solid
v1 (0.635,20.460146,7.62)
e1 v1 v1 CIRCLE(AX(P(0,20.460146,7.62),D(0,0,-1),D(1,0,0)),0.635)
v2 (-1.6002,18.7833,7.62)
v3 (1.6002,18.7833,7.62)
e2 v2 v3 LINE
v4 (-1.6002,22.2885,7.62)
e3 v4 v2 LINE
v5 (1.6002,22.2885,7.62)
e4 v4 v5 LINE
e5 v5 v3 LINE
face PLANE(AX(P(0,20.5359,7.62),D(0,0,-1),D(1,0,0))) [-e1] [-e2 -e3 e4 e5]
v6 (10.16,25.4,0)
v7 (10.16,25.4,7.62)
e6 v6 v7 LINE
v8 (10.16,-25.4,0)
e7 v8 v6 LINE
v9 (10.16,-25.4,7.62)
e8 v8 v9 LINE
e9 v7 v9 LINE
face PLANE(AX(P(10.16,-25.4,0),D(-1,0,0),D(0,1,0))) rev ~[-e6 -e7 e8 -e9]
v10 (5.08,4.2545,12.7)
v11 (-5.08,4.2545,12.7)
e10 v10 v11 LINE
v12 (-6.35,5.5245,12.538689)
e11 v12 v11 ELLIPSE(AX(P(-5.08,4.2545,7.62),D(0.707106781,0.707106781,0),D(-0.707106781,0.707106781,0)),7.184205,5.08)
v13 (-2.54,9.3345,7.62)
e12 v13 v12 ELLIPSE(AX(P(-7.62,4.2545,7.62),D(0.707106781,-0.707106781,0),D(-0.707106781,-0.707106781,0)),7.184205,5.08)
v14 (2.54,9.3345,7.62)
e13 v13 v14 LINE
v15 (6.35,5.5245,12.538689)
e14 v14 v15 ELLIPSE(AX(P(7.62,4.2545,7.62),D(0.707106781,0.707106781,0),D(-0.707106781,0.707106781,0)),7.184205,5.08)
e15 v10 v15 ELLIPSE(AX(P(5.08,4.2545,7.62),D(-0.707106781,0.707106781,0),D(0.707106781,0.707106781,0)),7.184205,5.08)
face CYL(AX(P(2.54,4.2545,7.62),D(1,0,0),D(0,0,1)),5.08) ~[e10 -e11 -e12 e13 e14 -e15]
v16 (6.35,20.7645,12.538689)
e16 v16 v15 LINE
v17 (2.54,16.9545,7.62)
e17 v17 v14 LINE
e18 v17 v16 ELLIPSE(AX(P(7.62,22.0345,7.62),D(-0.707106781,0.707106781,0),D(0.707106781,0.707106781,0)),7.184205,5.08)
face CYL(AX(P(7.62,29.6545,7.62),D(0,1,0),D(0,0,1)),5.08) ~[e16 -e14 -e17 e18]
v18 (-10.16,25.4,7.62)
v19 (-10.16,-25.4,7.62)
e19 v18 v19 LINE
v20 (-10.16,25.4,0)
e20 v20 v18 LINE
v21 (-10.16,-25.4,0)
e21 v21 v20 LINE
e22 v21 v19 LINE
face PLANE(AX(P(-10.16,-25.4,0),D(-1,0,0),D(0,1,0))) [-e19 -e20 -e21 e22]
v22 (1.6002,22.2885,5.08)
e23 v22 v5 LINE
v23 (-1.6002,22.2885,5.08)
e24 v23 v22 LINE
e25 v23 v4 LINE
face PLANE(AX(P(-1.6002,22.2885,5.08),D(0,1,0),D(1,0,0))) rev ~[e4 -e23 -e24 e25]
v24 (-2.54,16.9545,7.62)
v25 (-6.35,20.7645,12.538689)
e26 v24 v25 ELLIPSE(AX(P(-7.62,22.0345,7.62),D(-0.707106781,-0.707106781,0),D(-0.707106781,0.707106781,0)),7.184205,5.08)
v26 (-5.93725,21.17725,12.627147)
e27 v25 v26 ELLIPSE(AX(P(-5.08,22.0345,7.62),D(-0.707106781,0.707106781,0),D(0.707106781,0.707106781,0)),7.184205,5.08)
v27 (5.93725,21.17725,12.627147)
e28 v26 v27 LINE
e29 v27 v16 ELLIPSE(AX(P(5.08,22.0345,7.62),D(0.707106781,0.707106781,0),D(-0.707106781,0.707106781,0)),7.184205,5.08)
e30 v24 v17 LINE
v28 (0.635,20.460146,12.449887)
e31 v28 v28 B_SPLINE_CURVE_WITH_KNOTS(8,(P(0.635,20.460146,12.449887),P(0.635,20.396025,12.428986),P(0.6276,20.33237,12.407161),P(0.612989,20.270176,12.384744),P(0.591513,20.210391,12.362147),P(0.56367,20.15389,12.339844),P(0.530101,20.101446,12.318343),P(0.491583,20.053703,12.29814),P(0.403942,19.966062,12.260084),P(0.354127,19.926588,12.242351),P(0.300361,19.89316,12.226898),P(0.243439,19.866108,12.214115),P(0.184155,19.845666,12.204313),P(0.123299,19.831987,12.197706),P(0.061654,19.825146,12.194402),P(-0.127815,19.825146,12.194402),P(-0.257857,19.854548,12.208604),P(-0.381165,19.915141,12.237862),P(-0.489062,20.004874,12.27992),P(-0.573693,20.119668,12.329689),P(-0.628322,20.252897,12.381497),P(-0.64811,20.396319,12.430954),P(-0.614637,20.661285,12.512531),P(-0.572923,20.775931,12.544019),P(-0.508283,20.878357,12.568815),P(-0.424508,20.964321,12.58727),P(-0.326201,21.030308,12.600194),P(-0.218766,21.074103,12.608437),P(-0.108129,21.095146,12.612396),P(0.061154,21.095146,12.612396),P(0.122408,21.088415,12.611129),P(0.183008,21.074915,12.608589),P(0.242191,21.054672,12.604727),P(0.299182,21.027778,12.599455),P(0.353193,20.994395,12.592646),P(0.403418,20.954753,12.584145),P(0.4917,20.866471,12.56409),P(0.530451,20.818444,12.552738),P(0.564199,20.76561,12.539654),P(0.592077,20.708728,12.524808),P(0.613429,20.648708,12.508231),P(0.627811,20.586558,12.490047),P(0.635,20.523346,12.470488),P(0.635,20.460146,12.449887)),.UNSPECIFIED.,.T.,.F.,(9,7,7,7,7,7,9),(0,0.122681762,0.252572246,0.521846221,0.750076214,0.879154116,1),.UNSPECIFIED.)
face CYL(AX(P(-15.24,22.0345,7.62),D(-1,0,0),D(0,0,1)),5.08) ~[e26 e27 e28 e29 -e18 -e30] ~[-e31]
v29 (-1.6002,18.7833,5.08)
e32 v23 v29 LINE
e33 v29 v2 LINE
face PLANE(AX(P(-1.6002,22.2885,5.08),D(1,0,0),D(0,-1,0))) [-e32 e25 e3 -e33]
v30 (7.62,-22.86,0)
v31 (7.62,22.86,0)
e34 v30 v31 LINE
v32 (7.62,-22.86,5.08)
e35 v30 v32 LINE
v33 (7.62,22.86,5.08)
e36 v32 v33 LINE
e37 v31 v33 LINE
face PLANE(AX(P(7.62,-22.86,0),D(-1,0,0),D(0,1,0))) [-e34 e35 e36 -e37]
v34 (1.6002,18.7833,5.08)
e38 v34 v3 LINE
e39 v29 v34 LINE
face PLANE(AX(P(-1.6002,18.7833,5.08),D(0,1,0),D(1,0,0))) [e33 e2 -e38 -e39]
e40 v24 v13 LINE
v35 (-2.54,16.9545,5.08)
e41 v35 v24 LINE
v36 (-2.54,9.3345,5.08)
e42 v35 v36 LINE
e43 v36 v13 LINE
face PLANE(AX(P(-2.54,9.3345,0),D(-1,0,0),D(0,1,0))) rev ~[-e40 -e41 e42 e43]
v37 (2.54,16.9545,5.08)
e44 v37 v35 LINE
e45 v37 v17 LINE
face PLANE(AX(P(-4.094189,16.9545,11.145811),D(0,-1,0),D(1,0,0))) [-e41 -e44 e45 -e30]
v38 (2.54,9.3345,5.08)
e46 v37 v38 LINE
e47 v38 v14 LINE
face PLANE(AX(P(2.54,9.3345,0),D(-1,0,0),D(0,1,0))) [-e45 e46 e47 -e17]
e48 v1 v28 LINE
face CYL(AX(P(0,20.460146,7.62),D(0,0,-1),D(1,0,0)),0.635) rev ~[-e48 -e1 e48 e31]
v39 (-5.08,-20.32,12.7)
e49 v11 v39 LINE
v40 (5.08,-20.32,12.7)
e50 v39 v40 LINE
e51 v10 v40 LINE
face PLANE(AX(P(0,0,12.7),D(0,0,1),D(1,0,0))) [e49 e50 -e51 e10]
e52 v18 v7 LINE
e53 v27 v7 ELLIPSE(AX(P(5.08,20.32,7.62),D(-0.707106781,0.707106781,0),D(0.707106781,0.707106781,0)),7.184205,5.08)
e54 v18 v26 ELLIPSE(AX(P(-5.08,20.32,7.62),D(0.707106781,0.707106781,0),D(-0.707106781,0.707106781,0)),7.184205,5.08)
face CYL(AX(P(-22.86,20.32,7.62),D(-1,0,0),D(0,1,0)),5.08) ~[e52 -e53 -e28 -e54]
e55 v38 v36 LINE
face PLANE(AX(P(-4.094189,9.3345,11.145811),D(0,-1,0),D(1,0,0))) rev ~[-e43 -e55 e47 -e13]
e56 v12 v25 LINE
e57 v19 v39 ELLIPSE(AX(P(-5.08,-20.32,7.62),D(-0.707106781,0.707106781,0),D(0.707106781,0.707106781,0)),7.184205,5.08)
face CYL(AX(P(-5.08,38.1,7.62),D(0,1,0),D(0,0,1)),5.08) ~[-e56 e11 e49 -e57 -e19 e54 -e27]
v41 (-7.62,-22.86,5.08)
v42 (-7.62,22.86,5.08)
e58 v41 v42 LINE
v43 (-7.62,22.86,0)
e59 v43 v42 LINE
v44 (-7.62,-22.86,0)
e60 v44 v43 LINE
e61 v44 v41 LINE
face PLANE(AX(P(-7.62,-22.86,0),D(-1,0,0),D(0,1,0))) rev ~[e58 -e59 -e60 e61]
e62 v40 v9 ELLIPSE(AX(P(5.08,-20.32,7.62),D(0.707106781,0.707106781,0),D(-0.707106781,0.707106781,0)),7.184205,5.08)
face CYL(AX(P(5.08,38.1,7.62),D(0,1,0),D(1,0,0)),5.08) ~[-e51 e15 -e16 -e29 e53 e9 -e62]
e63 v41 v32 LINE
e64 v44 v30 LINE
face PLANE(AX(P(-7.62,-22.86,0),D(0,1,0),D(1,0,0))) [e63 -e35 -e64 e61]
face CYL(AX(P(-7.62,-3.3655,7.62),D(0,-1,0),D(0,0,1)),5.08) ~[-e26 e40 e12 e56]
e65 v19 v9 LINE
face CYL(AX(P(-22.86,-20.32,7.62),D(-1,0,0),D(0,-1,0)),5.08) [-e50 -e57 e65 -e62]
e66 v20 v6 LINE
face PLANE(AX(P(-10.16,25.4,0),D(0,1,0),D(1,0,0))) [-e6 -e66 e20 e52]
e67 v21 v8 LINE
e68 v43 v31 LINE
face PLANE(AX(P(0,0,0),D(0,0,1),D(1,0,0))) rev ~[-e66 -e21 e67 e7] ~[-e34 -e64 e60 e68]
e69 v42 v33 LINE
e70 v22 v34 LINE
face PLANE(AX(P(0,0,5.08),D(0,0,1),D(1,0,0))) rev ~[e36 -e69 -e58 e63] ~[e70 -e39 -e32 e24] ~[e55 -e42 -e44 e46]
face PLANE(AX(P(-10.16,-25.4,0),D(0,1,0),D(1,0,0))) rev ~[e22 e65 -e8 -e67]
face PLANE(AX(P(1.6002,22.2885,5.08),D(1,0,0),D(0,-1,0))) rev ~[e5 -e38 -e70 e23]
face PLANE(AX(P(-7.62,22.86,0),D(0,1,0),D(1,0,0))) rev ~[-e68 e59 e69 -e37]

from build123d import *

# Parameters (mm, degrees)
F0_W         = 20.32
F0_H         = 50.8
F1_DEPTH     = 12.7
F2_W         = 15.24
F2_H         = 45.72
F3_DEPTH     = 5.08
F4_W         = 3.2004
F4_H         = 3.5052
F5_DEPTH     = 2.54
F6_W         = 5.08
F6_H         = 7.62
F7_DEPTH     = 25.4
F8_T1_DEPTH  = 76.2
F8_T3_DEPTH  = 45.72
F8_T5_DEPTH  = 7.62
F8_T7_DEPTH  = 5.08
F8_T13_DEPTH = 20.32
F8_T17_DEPTH = 17.78
F8_T24_DEPTH = 20.32
F8_T28_DEPTH = 17.78
F8_T35_DEPTH = 17.78
F8_T39_DEPTH = 20.32
F8_T46_DEPTH = 20.32
F8_T50_DEPTH = 17.78
F9_R         = 0.635
F10_DEPTH    = 25.4


# Not quite as in the source:
# - a fillet or chamfer that OpenCascade refuses, or shapes differently, is made with other operations: its cross-section is extruded or revolved along the edge and cut away or added


with BuildPart() as f1:
    # F0 (on Top) → F1 (new body)
    with BuildSketch(Plane.XY):
        Rectangle(F0_W, F0_H)
    extrude(amount=F1_DEPTH)

    # F2 (on Top) → F3 (cut)
    with BuildSketch(Plane.XY):
        Rectangle(F2_W, F2_H)
    extrude(amount=F3_DEPTH, mode=Mode.SUBTRACT)

    # F4 (on face) → F5 (cut)
    with BuildSketch(Plane(origin=(0, 0, 5.08), x_dir=(1, 0, 0), z_dir=(0, 0, -1))):
        with Locations((0, -20.5359)):
            Rectangle(F4_W, F4_H)
    extrude(amount=-F5_DEPTH, mode=Mode.SUBTRACT)

    # F6 (on Top) → F7 (cut)
    with BuildSketch(Plane.XY):
        with Locations((0, 13.1445)):
            Rectangle(F6_W, F6_H)
    extrude(amount=F7_DEPTH, mode=Mode.SUBTRACT)

    # F8: fillet of radius 5.08 on 8 edges, made by hand

    # F8_s2 → F8_t1 (cut)
    with BuildSketch(Plane.XZ.offset(-38.1)):
        with BuildLine():
            ThreePointArc((10.16, 7.62), (8.6721024484, 11.2121024484), (5.08, 12.7))
            Line((5.08, 12.7), (10.16, 12.7))
            Line((10.16, 12.7), (10.16, 7.62))
        make_face()
        with BuildLine():
            ThreePointArc((-5.08, 12.7), (-8.6721024484, 11.2121024484), (-10.16, 7.62))
            Line((-10.16, 7.62), (-10.16, 12.7))
            Line((-10.16, 12.7), (-5.08, 12.7))
        make_face()
    extrude(amount=F8_T1_DEPTH, mode=Mode.SUBTRACT)

    # F8_s4 → F8_t3 (cut)
    with BuildSketch(Plane.YZ.offset(-22.86)):
        with BuildLine():
            ThreePointArc((-25.4, 7.62), (-23.9121024484, 11.2121024484), (-20.32, 12.7))
            Line((-20.32, 12.7), (-25.4, 12.7))
            Line((-25.4, 12.7), (-25.4, 7.62))
        make_face()
        with BuildLine():
            ThreePointArc((25.4, 7.62), (23.9121024484, 11.2121024484), (20.32, 12.7))
            Line((20.32, 12.7), (25.4, 12.7))
            Line((25.4, 12.7), (25.4, 7.62))
        make_face()
    extrude(amount=F8_T3_DEPTH, mode=Mode.SUBTRACT)

    # F8_s6 → F8_t5 (cut)
    with BuildSketch(Plane.XZ.offset(-16.9545)):
        with BuildLine():
            ThreePointArc((7.62, 12.7), (4.0278975516, 11.2121024484), (2.54, 7.62))
            Line((2.54, 7.62), (2.54, 12.7))
            Line((2.54, 12.7), (7.62, 12.7))
        make_face()
        with BuildLine():
            ThreePointArc((-7.62, 12.7), (-4.0278975516, 11.2121024484), (-2.54, 7.62))
            Line((-2.54, 7.62), (-2.54, 12.7))
            Line((-2.54, 12.7), (-7.62, 12.7))
        make_face()
    extrude(amount=F8_T5_DEPTH, mode=Mode.SUBTRACT)

    # F8_s8 → F8_t7 (cut)
    with BuildSketch(Plane.YZ.offset(-2.54)):
        with BuildLine():
            ThreePointArc((22.0345, 12.7), (18.4423975516, 11.2121024484), (16.9545, 7.62))
            Line((16.9545, 7.62), (16.9545, 12.7))
            Line((16.9545, 12.7), (22.0345, 12.7))
        make_face()
        with BuildLine():
            ThreePointArc((4.2545, 12.7), (7.8466024484, 11.2121024484), (9.3345, 7.62))
            Line((9.3345, 7.62), (9.3345, 12.7))
            Line((9.3345, 12.7), (4.2545, 12.7))
        make_face()
    extrude(amount=F8_T7_DEPTH, mode=Mode.SUBTRACT)


with BuildPart() as f8_tool11:
    # F8_s12 → F8_t13 (new body)
    with BuildSketch(Plane.XZ.offset(-29.6545)):
        with BuildLine():
            ThreePointArc((7.62, 12.7), (4.0278975516, 11.2121024484), (2.54, 7.62))
            Line((2.54, 7.62), (2.54, 12.7))
            Line((2.54, 12.7), (7.62, 12.7))
        make_face()
    extrude(amount=F8_T13_DEPTH)

    split(bisect_by=Plane.XZ.offset(-16.9545), keep=Keep.BOTTOM)


with BuildPart() as f8_tool15:
    # F8_s16 → F8_t17 (new body)
    with BuildSketch(Plane.YZ.offset(-2.54)):
        with BuildLine():
            ThreePointArc((22.0345, 12.7), (18.4423975516, 11.2121024484), (16.9545, 7.62))
            Line((16.9545, 7.62), (16.9545, 12.7))
            Line((16.9545, 12.7), (22.0345, 12.7))
        make_face()
    extrude(amount=F8_T17_DEPTH)

    split(bisect_by=Plane.YZ.offset(2.54), keep=Keep.TOP)


with BuildPart() as f8_tool11_1:
    add(f8_tool11.part)

    # F8_t19: intersect F8_tool15
    add(f8_tool15.part, mode=Mode.INTERSECT)


with BuildPart() as f1_1:
    add(f1.part)

    # F8_t9: cut F8_tool11
    add(f8_tool11_1.part, mode=Mode.SUBTRACT)


with BuildPart() as f8_tool22:
    # F8_s23 → F8_t24 (new body)
    with BuildSketch(Plane.XZ.offset(-16.9545)):
        with BuildLine():
            ThreePointArc((7.62, 12.7), (4.0278975516, 11.2121024484), (2.54, 7.62))
            Line((2.54, 7.62), (2.54, 12.7))
            Line((2.54, 12.7), (7.62, 12.7))
        make_face()
    extrude(amount=F8_T24_DEPTH)

    split(bisect_by=Plane.XZ.offset(-9.3345), keep=Keep.TOP)


with BuildPart() as f8_tool26:
    # F8_s27 → F8_t28 (new body)
    with BuildSketch(Plane.YZ.offset(15.24)):
        with BuildLine():
            ThreePointArc((4.2545, 12.7), (7.8466024484, 11.2121024484), (9.3345, 7.62))
            Line((9.3345, 7.62), (9.3345, 12.7))
            Line((9.3345, 12.7), (4.2545, 12.7))
        make_face()
    extrude(amount=-F8_T28_DEPTH)

    split(bisect_by=Plane.YZ.offset(2.54), keep=Keep.TOP)


with BuildPart() as f8_tool22_1:
    add(f8_tool22.part)

    # F8_t30: intersect F8_tool26
    add(f8_tool26.part, mode=Mode.INTERSECT)


with BuildPart() as f1_2:
    add(f1_1.part)

    # F8_t20: cut F8_tool22
    add(f8_tool22_1.part, mode=Mode.SUBTRACT)


with BuildPart() as f8_tool33:
    # F8_s34 → F8_t35 (new body)
    with BuildSketch(Plane.YZ.offset(-15.24)):
        with BuildLine():
            ThreePointArc((22.0345, 12.7), (18.4423975516, 11.2121024484), (16.9545, 7.62))
            Line((16.9545, 7.62), (16.9545, 12.7))
            Line((16.9545, 12.7), (22.0345, 12.7))
        make_face()
    extrude(amount=F8_T35_DEPTH)

    split(bisect_by=Plane.YZ.offset(-2.54), keep=Keep.BOTTOM)


with BuildPart() as f8_tool37:
    # F8_s38 → F8_t39 (new body)
    with BuildSketch(Plane.XZ.offset(-9.3345)):
        with BuildLine():
            ThreePointArc((-7.62, 12.7), (-4.0278975516, 11.2121024484), (-2.54, 7.62))
            Line((-2.54, 7.62), (-2.54, 12.7))
            Line((-2.54, 12.7), (-7.62, 12.7))
        make_face()
    extrude(amount=-F8_T39_DEPTH)

    split(bisect_by=Plane.XZ.offset(-16.9545), keep=Keep.BOTTOM)


with BuildPart() as f8_tool33_1:
    add(f8_tool33.part)

    # F8_t41: intersect F8_tool37
    add(f8_tool37.part, mode=Mode.INTERSECT)


with BuildPart() as f1_3:
    add(f1_2.part)

    # F8_t31: cut F8_tool33
    add(f8_tool33_1.part, mode=Mode.SUBTRACT)


with BuildPart() as f8_tool44:
    # F8_s45 → F8_t46 (new body)
    with BuildSketch(Plane.XZ.offset(3.3655)):
        with BuildLine():
            ThreePointArc((-7.62, 12.7), (-4.0278975516, 11.2121024484), (-2.54, 7.62))
            Line((-2.54, 7.62), (-2.54, 12.7))
            Line((-2.54, 12.7), (-7.62, 12.7))
        make_face()
    extrude(amount=-F8_T46_DEPTH)

    split(bisect_by=Plane.XZ.offset(-9.3345), keep=Keep.TOP)


with BuildPart() as f8_tool48:
    # F8_s49 → F8_t50 (new body)
    with BuildSketch(Plane.YZ.offset(2.54)):
        with BuildLine():
            ThreePointArc((4.2545, 12.7), (7.8466024484, 11.2121024484), (9.3345, 7.62))
            Line((9.3345, 7.62), (9.3345, 12.7))
            Line((9.3345, 12.7), (4.2545, 12.7))
        make_face()
    extrude(amount=-F8_T50_DEPTH)

    split(bisect_by=Plane.YZ.offset(-2.54), keep=Keep.BOTTOM)


with BuildPart() as f8_tool44_1:
    add(f8_tool44.part)

    # F8_t52: intersect F8_tool48
    add(f8_tool48.part, mode=Mode.INTERSECT)


with BuildPart() as f1_4:
    add(f1_3.part)

    # F8_t42: cut F8_tool44
    add(f8_tool44_1.part, mode=Mode.SUBTRACT)

    # F9 (on face) → F10 (cut)
    with BuildSketch(Plane(origin=(0, 0, 7.62), x_dir=(1, 0, 0), z_dir=(0, 0, -1))):
        with Locations((0, -20.460145548)):
            Circle(F9_R)
    extrude(amount=-F10_DEPTH, mode=Mode.SUBTRACT)


solid = f1_4.part
